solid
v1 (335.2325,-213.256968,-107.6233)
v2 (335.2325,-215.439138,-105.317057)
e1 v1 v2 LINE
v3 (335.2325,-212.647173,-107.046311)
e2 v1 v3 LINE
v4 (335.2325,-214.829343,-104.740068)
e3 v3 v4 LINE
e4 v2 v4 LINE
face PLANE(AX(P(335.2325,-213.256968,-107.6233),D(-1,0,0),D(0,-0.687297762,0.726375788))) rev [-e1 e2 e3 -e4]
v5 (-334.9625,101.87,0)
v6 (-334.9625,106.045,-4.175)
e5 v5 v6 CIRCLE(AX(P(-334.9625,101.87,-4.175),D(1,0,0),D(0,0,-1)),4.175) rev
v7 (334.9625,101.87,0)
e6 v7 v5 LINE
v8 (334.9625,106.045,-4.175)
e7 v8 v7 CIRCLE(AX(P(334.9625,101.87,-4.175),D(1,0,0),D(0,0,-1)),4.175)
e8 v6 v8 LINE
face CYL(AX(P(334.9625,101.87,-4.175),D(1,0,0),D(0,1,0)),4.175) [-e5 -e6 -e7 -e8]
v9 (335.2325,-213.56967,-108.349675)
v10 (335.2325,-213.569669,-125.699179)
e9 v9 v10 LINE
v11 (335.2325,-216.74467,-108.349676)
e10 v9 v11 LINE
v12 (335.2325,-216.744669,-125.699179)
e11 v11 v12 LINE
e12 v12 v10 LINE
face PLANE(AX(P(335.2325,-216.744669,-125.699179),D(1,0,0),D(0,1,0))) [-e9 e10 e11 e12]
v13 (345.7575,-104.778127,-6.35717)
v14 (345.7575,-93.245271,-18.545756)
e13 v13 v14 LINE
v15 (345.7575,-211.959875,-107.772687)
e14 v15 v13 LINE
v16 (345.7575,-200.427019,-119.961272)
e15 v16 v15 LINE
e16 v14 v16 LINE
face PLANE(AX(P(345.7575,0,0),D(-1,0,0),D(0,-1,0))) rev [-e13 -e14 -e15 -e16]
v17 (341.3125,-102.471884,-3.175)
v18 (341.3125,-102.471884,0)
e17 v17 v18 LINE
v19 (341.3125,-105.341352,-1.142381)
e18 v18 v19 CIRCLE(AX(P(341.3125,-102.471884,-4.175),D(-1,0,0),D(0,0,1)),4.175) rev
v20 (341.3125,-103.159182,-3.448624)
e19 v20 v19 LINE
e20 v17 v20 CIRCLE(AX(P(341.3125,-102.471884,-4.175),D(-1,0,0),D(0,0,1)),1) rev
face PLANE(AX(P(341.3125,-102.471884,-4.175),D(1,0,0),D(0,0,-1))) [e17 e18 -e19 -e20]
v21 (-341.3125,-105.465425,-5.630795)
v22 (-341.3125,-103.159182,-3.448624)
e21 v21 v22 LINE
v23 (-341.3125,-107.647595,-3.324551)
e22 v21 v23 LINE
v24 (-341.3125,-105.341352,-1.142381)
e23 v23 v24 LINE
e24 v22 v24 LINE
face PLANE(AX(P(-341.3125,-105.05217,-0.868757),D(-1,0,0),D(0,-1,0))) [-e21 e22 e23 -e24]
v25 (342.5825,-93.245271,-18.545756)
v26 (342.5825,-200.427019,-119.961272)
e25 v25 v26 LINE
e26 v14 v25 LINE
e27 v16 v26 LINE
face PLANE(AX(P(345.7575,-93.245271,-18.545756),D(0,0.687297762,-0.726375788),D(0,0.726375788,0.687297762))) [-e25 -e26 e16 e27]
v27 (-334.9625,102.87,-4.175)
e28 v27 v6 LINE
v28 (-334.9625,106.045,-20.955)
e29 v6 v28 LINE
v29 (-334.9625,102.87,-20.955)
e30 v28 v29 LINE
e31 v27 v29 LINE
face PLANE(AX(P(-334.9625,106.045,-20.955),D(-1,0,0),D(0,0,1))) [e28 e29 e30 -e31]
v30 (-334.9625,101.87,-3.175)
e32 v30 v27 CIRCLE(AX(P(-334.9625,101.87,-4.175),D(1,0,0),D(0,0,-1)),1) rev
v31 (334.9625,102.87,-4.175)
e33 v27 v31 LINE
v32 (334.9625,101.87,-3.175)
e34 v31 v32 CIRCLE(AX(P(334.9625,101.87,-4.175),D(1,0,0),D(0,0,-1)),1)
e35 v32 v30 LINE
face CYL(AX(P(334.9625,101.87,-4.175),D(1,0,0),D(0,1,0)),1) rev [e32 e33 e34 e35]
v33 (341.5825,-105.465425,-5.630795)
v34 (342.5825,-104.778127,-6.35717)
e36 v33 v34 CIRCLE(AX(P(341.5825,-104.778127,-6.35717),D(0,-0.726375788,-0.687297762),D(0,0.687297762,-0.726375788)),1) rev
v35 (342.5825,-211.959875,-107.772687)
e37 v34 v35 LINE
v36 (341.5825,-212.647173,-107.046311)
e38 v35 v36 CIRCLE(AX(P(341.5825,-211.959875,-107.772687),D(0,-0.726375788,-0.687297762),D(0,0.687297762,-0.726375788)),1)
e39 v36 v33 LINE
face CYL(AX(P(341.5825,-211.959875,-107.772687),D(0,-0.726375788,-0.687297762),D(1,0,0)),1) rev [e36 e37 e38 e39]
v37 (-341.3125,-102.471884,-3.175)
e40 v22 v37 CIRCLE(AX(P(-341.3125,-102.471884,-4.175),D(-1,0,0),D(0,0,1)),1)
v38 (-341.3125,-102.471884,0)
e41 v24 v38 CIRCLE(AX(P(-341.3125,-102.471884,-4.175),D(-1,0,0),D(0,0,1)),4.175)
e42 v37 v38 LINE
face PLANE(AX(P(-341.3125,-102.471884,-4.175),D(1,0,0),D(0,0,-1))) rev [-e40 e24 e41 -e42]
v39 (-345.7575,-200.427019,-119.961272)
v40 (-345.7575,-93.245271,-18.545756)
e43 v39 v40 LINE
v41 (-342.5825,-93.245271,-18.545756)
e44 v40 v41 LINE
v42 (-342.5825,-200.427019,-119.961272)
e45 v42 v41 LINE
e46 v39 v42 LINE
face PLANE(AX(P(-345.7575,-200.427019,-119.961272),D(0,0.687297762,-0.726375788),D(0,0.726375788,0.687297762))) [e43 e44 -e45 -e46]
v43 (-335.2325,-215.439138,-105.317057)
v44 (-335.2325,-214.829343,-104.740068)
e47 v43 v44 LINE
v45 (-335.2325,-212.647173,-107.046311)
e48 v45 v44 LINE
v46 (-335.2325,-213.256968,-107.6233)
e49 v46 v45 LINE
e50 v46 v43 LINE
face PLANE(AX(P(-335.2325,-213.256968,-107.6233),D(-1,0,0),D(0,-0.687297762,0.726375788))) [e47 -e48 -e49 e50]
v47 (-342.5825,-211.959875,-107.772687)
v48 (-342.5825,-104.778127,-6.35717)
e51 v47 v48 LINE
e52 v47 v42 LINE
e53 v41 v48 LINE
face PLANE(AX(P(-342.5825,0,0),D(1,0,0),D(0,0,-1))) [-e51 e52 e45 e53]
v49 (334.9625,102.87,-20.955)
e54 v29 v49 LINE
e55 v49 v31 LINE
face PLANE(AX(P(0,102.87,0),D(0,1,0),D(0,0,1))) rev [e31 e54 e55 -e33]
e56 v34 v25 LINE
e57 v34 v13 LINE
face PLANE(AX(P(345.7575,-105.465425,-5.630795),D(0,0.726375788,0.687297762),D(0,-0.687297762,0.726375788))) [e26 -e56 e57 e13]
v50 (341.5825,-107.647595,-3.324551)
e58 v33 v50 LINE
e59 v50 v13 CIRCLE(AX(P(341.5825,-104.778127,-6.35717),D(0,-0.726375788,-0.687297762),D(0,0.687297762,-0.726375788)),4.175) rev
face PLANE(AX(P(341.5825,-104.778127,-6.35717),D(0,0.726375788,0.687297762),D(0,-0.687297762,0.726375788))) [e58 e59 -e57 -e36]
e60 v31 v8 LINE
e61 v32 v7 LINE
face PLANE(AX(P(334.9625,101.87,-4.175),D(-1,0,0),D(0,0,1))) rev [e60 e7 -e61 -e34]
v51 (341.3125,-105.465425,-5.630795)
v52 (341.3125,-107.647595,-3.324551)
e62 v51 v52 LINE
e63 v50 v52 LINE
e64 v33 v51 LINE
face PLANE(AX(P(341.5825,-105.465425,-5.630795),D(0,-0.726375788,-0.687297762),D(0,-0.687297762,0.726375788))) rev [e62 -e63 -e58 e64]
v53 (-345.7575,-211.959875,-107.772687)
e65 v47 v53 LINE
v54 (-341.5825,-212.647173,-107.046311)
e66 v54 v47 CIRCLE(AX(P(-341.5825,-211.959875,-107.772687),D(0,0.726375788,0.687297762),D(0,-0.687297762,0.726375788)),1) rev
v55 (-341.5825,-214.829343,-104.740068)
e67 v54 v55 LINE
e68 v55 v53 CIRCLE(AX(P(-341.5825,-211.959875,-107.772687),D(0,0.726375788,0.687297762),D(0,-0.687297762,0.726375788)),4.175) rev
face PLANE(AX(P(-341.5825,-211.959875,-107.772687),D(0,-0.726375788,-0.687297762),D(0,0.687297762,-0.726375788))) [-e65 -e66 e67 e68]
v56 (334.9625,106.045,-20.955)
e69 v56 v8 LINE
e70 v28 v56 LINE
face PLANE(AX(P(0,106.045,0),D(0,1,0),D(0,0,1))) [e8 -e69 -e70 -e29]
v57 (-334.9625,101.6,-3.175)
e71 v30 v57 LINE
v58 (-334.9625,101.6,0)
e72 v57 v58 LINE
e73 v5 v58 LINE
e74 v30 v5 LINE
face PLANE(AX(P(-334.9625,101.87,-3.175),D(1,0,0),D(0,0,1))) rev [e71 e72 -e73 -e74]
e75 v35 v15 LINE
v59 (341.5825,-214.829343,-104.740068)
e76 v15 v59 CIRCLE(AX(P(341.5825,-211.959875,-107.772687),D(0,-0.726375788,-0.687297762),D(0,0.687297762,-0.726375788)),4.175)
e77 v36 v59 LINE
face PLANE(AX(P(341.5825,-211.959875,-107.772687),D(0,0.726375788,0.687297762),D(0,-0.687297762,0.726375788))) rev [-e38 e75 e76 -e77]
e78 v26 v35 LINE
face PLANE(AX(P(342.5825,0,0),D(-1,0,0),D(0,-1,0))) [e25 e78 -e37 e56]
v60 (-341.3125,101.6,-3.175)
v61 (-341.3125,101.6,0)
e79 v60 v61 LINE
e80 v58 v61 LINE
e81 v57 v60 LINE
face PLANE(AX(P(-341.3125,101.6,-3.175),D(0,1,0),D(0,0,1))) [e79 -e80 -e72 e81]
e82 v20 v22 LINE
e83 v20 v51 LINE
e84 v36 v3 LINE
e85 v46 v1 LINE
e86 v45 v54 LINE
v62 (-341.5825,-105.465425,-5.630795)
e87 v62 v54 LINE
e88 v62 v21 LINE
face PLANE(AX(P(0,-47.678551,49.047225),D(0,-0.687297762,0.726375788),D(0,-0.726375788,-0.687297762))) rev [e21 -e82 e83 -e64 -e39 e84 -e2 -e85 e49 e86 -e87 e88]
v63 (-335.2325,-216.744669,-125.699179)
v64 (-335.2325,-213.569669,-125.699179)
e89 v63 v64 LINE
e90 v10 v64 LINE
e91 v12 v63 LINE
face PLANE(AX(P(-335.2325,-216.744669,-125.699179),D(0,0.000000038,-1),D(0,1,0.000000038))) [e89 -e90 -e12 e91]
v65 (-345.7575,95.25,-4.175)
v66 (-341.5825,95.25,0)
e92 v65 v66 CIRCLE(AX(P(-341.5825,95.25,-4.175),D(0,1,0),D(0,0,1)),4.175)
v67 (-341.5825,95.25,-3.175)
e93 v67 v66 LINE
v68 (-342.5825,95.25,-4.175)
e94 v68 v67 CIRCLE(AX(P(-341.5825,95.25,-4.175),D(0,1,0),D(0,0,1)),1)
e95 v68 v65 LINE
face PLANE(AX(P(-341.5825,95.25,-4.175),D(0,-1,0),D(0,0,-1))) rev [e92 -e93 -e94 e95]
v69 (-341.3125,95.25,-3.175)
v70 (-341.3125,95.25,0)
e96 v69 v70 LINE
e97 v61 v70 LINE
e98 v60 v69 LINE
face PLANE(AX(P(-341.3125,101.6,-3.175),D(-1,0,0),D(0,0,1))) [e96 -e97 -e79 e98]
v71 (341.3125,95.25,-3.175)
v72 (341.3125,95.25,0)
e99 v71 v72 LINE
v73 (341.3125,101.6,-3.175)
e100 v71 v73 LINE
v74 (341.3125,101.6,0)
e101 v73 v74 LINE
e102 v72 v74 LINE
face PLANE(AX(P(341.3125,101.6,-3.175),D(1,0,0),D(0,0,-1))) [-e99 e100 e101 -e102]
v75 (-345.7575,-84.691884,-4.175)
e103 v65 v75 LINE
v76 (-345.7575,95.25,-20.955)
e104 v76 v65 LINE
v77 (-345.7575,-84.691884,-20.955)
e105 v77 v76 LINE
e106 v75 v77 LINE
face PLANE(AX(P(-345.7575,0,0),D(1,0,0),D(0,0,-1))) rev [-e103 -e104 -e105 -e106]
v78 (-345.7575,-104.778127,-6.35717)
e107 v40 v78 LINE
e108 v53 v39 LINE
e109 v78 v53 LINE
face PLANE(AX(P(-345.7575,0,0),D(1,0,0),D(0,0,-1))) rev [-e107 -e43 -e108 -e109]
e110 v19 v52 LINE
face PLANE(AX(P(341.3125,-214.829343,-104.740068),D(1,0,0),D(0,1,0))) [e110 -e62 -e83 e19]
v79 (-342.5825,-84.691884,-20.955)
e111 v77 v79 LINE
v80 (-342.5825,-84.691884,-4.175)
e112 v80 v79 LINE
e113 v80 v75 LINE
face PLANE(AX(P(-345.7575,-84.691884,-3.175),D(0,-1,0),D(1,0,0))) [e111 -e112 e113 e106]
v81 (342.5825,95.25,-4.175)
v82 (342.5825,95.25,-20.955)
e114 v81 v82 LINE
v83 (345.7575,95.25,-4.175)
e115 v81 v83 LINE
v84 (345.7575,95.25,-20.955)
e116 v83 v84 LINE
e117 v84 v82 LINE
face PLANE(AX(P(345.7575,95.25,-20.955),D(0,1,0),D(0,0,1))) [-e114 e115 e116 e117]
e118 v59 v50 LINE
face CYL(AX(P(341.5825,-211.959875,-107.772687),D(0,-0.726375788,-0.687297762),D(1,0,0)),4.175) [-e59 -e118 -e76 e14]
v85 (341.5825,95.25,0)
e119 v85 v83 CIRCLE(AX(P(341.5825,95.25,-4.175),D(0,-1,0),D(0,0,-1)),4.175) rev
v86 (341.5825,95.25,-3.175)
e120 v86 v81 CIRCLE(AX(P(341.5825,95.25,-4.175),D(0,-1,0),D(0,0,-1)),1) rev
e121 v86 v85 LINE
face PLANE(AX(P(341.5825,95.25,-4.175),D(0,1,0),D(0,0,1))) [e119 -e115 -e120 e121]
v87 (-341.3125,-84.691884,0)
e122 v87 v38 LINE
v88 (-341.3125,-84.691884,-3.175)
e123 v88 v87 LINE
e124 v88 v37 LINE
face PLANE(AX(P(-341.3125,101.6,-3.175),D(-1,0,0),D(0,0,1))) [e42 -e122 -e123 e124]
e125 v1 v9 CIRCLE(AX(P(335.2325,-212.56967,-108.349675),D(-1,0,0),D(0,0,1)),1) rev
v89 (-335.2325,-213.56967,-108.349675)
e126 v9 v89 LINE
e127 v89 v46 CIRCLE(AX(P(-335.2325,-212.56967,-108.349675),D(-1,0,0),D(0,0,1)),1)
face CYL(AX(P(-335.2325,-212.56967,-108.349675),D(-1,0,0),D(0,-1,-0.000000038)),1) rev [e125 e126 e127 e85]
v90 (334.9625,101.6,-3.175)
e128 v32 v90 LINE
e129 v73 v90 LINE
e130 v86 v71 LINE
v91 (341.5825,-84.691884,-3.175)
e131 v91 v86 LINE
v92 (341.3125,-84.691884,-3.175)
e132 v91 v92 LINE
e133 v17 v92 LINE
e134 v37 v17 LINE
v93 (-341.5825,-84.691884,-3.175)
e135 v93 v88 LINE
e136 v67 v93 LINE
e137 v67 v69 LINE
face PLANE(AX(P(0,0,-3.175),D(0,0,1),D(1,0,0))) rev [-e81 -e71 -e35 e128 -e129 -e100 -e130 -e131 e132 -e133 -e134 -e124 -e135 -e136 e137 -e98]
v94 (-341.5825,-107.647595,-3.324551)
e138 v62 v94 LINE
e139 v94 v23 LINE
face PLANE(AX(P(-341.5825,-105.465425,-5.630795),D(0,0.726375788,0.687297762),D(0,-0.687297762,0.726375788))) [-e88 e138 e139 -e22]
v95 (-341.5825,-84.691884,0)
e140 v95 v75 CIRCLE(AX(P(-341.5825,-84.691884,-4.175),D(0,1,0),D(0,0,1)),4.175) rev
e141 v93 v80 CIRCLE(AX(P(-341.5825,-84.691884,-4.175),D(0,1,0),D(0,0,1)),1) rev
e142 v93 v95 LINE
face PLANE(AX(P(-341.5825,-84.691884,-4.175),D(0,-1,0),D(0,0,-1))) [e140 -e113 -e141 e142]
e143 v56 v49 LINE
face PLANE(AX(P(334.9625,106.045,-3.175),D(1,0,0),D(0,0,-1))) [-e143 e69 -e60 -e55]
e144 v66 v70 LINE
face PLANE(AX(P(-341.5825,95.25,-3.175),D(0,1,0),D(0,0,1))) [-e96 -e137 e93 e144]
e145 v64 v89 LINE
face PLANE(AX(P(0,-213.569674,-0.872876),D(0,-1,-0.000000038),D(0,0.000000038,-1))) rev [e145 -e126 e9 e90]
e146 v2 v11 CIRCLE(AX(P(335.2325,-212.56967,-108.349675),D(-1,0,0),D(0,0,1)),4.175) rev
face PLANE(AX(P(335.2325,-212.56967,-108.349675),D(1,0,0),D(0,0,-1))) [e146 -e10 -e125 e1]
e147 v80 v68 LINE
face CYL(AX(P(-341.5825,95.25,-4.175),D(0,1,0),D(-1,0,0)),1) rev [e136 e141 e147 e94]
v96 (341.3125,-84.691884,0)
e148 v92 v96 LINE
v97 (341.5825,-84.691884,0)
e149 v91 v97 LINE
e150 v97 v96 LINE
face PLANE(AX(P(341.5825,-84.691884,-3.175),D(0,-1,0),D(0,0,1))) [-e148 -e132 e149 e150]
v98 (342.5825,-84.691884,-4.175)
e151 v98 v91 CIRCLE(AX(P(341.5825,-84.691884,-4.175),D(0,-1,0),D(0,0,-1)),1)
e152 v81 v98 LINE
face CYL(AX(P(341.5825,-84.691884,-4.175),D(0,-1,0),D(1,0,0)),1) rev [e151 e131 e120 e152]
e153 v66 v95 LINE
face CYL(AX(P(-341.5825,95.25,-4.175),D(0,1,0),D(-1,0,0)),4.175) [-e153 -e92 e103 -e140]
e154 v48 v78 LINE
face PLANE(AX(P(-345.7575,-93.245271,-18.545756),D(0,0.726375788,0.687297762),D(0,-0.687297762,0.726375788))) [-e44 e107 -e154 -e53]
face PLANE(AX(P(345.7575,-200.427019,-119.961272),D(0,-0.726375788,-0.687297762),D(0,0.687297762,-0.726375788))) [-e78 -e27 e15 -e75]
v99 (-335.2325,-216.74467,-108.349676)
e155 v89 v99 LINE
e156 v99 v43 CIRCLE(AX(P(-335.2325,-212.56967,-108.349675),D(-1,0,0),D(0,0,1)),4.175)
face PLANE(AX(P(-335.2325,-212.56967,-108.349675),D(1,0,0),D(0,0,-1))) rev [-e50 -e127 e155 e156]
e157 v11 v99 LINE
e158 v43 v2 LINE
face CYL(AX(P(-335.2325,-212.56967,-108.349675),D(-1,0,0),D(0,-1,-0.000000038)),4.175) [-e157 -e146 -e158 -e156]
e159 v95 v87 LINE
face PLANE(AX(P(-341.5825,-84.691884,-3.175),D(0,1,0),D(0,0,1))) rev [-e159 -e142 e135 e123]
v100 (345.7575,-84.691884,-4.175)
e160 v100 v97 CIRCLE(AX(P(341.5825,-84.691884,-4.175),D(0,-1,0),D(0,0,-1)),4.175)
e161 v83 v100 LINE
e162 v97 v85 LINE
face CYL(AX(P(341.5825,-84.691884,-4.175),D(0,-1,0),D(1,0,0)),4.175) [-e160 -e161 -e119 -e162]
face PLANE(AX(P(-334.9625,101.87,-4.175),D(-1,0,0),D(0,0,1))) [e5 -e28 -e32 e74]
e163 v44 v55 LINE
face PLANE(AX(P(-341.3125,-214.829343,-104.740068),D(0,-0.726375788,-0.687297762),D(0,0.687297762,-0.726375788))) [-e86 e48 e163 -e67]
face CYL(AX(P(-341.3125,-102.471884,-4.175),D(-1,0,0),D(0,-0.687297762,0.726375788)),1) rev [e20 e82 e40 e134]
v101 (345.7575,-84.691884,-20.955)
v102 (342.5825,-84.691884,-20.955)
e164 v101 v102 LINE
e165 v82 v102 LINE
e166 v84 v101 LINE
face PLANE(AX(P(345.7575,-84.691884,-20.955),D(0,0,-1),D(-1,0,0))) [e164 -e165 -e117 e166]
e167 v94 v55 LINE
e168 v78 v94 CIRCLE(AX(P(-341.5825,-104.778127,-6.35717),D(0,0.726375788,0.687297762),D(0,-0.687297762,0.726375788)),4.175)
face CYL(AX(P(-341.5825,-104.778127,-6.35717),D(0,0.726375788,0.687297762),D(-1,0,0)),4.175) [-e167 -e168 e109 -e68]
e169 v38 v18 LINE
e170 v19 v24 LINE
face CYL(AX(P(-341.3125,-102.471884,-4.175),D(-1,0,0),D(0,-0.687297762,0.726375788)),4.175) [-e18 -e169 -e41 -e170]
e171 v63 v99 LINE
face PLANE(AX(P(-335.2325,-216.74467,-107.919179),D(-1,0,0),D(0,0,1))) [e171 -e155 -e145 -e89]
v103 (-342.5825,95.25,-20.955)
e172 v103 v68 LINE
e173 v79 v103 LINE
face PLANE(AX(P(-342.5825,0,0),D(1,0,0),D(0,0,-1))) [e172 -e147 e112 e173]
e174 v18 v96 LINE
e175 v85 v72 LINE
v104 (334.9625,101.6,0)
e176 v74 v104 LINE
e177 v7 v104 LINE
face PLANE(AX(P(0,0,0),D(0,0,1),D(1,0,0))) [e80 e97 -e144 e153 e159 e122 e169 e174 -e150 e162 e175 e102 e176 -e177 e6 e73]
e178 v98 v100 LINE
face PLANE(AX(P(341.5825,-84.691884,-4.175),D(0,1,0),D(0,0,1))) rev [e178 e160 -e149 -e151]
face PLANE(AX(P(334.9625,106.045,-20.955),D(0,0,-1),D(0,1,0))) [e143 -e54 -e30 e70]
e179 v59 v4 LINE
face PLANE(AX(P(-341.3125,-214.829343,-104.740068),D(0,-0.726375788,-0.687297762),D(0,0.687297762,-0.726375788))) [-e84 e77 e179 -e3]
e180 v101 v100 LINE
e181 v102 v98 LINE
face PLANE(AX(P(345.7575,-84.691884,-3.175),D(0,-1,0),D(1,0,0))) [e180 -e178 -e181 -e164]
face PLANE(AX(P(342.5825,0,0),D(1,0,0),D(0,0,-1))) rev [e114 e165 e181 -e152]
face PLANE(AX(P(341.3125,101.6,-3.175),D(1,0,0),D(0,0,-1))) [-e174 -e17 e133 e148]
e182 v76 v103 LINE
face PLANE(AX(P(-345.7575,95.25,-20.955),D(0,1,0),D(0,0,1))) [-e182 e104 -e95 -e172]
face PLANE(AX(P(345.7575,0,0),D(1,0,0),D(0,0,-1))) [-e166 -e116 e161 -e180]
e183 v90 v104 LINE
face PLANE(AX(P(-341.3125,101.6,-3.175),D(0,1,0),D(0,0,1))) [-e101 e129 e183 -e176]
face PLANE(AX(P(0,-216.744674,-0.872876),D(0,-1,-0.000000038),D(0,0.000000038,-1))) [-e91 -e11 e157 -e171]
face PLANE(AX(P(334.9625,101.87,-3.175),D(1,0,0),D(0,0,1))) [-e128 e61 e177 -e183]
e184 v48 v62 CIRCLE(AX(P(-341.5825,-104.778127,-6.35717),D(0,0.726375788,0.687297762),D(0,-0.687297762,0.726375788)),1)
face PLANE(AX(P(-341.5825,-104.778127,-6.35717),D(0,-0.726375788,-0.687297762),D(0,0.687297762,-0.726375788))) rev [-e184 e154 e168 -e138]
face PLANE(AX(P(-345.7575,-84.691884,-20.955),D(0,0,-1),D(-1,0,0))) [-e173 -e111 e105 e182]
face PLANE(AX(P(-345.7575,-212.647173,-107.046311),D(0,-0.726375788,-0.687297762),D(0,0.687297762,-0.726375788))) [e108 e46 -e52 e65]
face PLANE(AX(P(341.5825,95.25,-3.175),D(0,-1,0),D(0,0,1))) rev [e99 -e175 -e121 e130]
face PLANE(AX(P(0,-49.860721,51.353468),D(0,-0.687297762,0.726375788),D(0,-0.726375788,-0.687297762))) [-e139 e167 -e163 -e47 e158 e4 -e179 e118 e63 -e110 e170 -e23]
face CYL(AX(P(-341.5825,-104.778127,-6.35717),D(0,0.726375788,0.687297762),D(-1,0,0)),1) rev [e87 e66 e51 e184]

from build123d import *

# Parameters (mm, degrees)
SKETCH1_W                 = 682.625
SKETCH1_H                 = 203.2
BASE_FLANGE1_DEPTH        = 3.175
EDGE_FLANGE1_DEPTH        = 682.625
EDGE_FLANGE3_DEPTH        = 669.925
EDGE_FLANGE3_BEND_DEPTH   = 179.941884035
EDGE_FLANGE3_BEND_2_DEPTH = 179.941884035
EDGE_FLANGE3_BEND_3_DEPTH = 147.556884035
EDGE_FLANGE3_BEND_4_DEPTH = 147.556884035
EDGE_FLANGE4_DEPTH        = 670.465


# Sheet-metal steps are written as plain solids
with BuildPart() as part:
    # Sketch1 → Base-Flange1 (new body)
    with BuildSketch(Plane.XY):
        Rectangle(SKETCH1_W, SKETCH1_H)
    extrude(amount=-BASE_FLANGE1_DEPTH)

    # Edge-Flange1 section (across the edge) → Edge-Flange1 (add)
    with BuildSketch(Plane(origin=(341.3125, -102.87, -3.175), x_dir=(0, 0.6872977622647618, -0.7263757884083493), z_dir=(-1, 0, 0))):
        with BuildLine():
            Line((-3.175, 0.398115965), (-3.175, 151.13))
            Line((-3.175, 151.13), (0, 151.13))
            Line((0, 151.13), (0, 0.398115965))
            ThreePointArc((0, 0.398115965), (0.070920943, 0.02823476), (0.273624212, -0.289181798))
            Line((0.273624212, -0.289181798), (0.872868158, -0.922497251))
            Line((0.872868158, -0.922497251), (-1.43337497, -3.104667646))
            Line((-1.43337497, -3.104667646), (-2.032618917, -2.471352193))
            ThreePointArc((-2.032618917, -2.471352193), (-2.878905063, -1.146138066), (-3.175, 0.398115965))
        make_face()
    extrude(amount=EDGE_FLANGE1_DEPTH)

    # Edge-Flange3 section (across the edge) → Edge-Flange3 (add)
    with BuildSketch(Plane(origin=(-334.9625, 102.87, -3.175), x_dir=(0, -1, 0), z_dir=(1, 0, 0))):
        with BuildLine():
            Line((-3.175, 1), (-3.175, 17.78))
            Line((-3.175, 17.78), (0, 17.78))
            Line((0, 17.78), (0, 1))
            ThreePointArc((0, 1), (0.292893219, 0.292893219), (1, 0))
            Line((1, 0), (1.27, 0))
            Line((1.27, 0), (1.27, -3.175))
            Line((1.27, -3.175), (1, -3.175))
            ThreePointArc((1, -3.175), (-1.952170811, -1.952170811), (-3.175, 1))
        make_face()
    extrude(amount=EDGE_FLANGE3_DEPTH)

    # Edge-Flange3 section 2 (across the edge) → Edge-Flange3 bend (add)
    with BuildSketch(Plane(origin=(-342.5825, -84.691884035, -3.175), x_dir=(1, 0, 0), z_dir=(0, 1, 0))):
        with BuildLine():
            Line((-3.175, 1), (-3.175, 17.78))
            Line((-3.175, 17.78), (0, 17.78))
            Line((0, 17.78), (0, 1))
            ThreePointArc((0, 1), (0.292893219, 0.292893219), (1, 0))
            Line((1, 0), (1.27, 0))
            Line((1.27, 0), (1.27, -3.175))
            Line((1.27, -3.175), (1, -3.175))
            ThreePointArc((1, -3.175), (-1.952170811, -1.952170811), (-3.175, 1))
        make_face()
    extrude(amount=EDGE_FLANGE3_BEND_DEPTH)

    # Edge-Flange3 section 3 (across the edge) → Edge-Flange3 bend 2 (add)
    with BuildSketch(Plane(origin=(342.5825, 95.25, -3.175), x_dir=(-1, 0, 0), z_dir=(0, -1, 0))):
        with BuildLine():
            Line((-3.175, 1), (-3.175, 17.78))
            Line((-3.175, 17.78), (0, 17.78))
            Line((0, 17.78), (0, 1))
            ThreePointArc((0, 1), (0.292893219, 0.292893219), (1, 0))
            Line((1, 0), (1.27, 0))
            Line((1.27, 0), (1.27, -3.175))
            Line((1.27, -3.175), (1, -3.175))
            ThreePointArc((1, -3.175), (-1.952170811, -1.952170811), (-3.175, 1))
        make_face()
    extrude(amount=EDGE_FLANGE3_BEND_2_DEPTH)

    # Edge-Flange3 section 4 (across the edge) → Edge-Flange3 bend 3 (add)
    with BuildSketch(Plane(origin=(-342.5825, -212.647172902, -107.046310811), x_dir=(1, 0, 0), z_dir=(1.4731097295439079e-15, 0.7263757884083494, 0.6872977622647618))):
        with BuildLine():
            Line((-3.175, 1), (-3.175, 17.78))
            Line((-3.175, 17.78), (0, 17.78))
            Line((0, 17.78), (0, 1))
            ThreePointArc((0, 1), (0.292893219, 0.292893219), (1, 0))
            Line((1, 0), (1.27, 0))
            Line((1.27, 0), (1.27, -3.175))
            Line((1.27, -3.175), (1, -3.175))
            ThreePointArc((1, -3.175), (-1.952170811, -1.952170811), (-3.175, 1))
        make_face()
    extrude(amount=EDGE_FLANGE3_BEND_3_DEPTH)

    # Edge-Flange3 section 5 (across the edge) → Edge-Flange3 bend 4 (add)
    with BuildSketch(Plane(origin=(342.5825, -105.465424926, -5.630794607), x_dir=(-1, 0, 0), z_dir=(-1.4731097295439075e-15, -0.7263757884083494, -0.6872977622647617))):
        with BuildLine():
            Line((-3.175, 1), (-3.175, 17.78))
            Line((-3.175, 17.78), (0, 17.78))
            Line((0, 17.78), (0, 1))
            ThreePointArc((0, 1), (0.292893219, 0.292893219), (1, 0))
            Line((1, 0), (1.27, 0))
            Line((1.27, 0), (1.27, -3.175))
            Line((1.27, -3.175), (1, -3.175))
            ThreePointArc((1, -3.175), (-1.952170811, -1.952170811), (-3.175, 1))
        make_face()
    extrude(amount=EDGE_FLANGE3_BEND_4_DEPTH)

    # Edge-Flange4 section (across the edge) → Edge-Flange4 (add)
    with BuildSketch(Plane(origin=(335.2325, -213.569670153, -107.919178969), x_dir=(0, 0.9999999999999994, 3.7524568563540583e-08), z_dir=(-1, 0, 0))):
        with BuildLine():
            Line((-3.175, 0.430496527), (-3.175, 17.78))
            Line((-3.175, 17.78), (0, 17.78))
            Line((0, 17.78), (0, 0.430496527))
            ThreePointArc((0, 0.430496527), (0.081496398, 0.035083916), (0.312702265, -0.295879288))
            Line((0.312702265, -0.295879288), (0.922497284, -0.872868123))
            Line((0.922497284, -0.872868123), (-1.259673025, -3.179111334))
            Line((-1.259673025, -3.179111334), (-1.869468044, -2.602122498))
            ThreePointArc((-1.869468044, -2.602122498), (-2.83475254, -1.220351122), (-3.175, 0.430496527))
        make_face()
    extrude(amount=EDGE_FLANGE4_DEPTH)


solid = part.part
